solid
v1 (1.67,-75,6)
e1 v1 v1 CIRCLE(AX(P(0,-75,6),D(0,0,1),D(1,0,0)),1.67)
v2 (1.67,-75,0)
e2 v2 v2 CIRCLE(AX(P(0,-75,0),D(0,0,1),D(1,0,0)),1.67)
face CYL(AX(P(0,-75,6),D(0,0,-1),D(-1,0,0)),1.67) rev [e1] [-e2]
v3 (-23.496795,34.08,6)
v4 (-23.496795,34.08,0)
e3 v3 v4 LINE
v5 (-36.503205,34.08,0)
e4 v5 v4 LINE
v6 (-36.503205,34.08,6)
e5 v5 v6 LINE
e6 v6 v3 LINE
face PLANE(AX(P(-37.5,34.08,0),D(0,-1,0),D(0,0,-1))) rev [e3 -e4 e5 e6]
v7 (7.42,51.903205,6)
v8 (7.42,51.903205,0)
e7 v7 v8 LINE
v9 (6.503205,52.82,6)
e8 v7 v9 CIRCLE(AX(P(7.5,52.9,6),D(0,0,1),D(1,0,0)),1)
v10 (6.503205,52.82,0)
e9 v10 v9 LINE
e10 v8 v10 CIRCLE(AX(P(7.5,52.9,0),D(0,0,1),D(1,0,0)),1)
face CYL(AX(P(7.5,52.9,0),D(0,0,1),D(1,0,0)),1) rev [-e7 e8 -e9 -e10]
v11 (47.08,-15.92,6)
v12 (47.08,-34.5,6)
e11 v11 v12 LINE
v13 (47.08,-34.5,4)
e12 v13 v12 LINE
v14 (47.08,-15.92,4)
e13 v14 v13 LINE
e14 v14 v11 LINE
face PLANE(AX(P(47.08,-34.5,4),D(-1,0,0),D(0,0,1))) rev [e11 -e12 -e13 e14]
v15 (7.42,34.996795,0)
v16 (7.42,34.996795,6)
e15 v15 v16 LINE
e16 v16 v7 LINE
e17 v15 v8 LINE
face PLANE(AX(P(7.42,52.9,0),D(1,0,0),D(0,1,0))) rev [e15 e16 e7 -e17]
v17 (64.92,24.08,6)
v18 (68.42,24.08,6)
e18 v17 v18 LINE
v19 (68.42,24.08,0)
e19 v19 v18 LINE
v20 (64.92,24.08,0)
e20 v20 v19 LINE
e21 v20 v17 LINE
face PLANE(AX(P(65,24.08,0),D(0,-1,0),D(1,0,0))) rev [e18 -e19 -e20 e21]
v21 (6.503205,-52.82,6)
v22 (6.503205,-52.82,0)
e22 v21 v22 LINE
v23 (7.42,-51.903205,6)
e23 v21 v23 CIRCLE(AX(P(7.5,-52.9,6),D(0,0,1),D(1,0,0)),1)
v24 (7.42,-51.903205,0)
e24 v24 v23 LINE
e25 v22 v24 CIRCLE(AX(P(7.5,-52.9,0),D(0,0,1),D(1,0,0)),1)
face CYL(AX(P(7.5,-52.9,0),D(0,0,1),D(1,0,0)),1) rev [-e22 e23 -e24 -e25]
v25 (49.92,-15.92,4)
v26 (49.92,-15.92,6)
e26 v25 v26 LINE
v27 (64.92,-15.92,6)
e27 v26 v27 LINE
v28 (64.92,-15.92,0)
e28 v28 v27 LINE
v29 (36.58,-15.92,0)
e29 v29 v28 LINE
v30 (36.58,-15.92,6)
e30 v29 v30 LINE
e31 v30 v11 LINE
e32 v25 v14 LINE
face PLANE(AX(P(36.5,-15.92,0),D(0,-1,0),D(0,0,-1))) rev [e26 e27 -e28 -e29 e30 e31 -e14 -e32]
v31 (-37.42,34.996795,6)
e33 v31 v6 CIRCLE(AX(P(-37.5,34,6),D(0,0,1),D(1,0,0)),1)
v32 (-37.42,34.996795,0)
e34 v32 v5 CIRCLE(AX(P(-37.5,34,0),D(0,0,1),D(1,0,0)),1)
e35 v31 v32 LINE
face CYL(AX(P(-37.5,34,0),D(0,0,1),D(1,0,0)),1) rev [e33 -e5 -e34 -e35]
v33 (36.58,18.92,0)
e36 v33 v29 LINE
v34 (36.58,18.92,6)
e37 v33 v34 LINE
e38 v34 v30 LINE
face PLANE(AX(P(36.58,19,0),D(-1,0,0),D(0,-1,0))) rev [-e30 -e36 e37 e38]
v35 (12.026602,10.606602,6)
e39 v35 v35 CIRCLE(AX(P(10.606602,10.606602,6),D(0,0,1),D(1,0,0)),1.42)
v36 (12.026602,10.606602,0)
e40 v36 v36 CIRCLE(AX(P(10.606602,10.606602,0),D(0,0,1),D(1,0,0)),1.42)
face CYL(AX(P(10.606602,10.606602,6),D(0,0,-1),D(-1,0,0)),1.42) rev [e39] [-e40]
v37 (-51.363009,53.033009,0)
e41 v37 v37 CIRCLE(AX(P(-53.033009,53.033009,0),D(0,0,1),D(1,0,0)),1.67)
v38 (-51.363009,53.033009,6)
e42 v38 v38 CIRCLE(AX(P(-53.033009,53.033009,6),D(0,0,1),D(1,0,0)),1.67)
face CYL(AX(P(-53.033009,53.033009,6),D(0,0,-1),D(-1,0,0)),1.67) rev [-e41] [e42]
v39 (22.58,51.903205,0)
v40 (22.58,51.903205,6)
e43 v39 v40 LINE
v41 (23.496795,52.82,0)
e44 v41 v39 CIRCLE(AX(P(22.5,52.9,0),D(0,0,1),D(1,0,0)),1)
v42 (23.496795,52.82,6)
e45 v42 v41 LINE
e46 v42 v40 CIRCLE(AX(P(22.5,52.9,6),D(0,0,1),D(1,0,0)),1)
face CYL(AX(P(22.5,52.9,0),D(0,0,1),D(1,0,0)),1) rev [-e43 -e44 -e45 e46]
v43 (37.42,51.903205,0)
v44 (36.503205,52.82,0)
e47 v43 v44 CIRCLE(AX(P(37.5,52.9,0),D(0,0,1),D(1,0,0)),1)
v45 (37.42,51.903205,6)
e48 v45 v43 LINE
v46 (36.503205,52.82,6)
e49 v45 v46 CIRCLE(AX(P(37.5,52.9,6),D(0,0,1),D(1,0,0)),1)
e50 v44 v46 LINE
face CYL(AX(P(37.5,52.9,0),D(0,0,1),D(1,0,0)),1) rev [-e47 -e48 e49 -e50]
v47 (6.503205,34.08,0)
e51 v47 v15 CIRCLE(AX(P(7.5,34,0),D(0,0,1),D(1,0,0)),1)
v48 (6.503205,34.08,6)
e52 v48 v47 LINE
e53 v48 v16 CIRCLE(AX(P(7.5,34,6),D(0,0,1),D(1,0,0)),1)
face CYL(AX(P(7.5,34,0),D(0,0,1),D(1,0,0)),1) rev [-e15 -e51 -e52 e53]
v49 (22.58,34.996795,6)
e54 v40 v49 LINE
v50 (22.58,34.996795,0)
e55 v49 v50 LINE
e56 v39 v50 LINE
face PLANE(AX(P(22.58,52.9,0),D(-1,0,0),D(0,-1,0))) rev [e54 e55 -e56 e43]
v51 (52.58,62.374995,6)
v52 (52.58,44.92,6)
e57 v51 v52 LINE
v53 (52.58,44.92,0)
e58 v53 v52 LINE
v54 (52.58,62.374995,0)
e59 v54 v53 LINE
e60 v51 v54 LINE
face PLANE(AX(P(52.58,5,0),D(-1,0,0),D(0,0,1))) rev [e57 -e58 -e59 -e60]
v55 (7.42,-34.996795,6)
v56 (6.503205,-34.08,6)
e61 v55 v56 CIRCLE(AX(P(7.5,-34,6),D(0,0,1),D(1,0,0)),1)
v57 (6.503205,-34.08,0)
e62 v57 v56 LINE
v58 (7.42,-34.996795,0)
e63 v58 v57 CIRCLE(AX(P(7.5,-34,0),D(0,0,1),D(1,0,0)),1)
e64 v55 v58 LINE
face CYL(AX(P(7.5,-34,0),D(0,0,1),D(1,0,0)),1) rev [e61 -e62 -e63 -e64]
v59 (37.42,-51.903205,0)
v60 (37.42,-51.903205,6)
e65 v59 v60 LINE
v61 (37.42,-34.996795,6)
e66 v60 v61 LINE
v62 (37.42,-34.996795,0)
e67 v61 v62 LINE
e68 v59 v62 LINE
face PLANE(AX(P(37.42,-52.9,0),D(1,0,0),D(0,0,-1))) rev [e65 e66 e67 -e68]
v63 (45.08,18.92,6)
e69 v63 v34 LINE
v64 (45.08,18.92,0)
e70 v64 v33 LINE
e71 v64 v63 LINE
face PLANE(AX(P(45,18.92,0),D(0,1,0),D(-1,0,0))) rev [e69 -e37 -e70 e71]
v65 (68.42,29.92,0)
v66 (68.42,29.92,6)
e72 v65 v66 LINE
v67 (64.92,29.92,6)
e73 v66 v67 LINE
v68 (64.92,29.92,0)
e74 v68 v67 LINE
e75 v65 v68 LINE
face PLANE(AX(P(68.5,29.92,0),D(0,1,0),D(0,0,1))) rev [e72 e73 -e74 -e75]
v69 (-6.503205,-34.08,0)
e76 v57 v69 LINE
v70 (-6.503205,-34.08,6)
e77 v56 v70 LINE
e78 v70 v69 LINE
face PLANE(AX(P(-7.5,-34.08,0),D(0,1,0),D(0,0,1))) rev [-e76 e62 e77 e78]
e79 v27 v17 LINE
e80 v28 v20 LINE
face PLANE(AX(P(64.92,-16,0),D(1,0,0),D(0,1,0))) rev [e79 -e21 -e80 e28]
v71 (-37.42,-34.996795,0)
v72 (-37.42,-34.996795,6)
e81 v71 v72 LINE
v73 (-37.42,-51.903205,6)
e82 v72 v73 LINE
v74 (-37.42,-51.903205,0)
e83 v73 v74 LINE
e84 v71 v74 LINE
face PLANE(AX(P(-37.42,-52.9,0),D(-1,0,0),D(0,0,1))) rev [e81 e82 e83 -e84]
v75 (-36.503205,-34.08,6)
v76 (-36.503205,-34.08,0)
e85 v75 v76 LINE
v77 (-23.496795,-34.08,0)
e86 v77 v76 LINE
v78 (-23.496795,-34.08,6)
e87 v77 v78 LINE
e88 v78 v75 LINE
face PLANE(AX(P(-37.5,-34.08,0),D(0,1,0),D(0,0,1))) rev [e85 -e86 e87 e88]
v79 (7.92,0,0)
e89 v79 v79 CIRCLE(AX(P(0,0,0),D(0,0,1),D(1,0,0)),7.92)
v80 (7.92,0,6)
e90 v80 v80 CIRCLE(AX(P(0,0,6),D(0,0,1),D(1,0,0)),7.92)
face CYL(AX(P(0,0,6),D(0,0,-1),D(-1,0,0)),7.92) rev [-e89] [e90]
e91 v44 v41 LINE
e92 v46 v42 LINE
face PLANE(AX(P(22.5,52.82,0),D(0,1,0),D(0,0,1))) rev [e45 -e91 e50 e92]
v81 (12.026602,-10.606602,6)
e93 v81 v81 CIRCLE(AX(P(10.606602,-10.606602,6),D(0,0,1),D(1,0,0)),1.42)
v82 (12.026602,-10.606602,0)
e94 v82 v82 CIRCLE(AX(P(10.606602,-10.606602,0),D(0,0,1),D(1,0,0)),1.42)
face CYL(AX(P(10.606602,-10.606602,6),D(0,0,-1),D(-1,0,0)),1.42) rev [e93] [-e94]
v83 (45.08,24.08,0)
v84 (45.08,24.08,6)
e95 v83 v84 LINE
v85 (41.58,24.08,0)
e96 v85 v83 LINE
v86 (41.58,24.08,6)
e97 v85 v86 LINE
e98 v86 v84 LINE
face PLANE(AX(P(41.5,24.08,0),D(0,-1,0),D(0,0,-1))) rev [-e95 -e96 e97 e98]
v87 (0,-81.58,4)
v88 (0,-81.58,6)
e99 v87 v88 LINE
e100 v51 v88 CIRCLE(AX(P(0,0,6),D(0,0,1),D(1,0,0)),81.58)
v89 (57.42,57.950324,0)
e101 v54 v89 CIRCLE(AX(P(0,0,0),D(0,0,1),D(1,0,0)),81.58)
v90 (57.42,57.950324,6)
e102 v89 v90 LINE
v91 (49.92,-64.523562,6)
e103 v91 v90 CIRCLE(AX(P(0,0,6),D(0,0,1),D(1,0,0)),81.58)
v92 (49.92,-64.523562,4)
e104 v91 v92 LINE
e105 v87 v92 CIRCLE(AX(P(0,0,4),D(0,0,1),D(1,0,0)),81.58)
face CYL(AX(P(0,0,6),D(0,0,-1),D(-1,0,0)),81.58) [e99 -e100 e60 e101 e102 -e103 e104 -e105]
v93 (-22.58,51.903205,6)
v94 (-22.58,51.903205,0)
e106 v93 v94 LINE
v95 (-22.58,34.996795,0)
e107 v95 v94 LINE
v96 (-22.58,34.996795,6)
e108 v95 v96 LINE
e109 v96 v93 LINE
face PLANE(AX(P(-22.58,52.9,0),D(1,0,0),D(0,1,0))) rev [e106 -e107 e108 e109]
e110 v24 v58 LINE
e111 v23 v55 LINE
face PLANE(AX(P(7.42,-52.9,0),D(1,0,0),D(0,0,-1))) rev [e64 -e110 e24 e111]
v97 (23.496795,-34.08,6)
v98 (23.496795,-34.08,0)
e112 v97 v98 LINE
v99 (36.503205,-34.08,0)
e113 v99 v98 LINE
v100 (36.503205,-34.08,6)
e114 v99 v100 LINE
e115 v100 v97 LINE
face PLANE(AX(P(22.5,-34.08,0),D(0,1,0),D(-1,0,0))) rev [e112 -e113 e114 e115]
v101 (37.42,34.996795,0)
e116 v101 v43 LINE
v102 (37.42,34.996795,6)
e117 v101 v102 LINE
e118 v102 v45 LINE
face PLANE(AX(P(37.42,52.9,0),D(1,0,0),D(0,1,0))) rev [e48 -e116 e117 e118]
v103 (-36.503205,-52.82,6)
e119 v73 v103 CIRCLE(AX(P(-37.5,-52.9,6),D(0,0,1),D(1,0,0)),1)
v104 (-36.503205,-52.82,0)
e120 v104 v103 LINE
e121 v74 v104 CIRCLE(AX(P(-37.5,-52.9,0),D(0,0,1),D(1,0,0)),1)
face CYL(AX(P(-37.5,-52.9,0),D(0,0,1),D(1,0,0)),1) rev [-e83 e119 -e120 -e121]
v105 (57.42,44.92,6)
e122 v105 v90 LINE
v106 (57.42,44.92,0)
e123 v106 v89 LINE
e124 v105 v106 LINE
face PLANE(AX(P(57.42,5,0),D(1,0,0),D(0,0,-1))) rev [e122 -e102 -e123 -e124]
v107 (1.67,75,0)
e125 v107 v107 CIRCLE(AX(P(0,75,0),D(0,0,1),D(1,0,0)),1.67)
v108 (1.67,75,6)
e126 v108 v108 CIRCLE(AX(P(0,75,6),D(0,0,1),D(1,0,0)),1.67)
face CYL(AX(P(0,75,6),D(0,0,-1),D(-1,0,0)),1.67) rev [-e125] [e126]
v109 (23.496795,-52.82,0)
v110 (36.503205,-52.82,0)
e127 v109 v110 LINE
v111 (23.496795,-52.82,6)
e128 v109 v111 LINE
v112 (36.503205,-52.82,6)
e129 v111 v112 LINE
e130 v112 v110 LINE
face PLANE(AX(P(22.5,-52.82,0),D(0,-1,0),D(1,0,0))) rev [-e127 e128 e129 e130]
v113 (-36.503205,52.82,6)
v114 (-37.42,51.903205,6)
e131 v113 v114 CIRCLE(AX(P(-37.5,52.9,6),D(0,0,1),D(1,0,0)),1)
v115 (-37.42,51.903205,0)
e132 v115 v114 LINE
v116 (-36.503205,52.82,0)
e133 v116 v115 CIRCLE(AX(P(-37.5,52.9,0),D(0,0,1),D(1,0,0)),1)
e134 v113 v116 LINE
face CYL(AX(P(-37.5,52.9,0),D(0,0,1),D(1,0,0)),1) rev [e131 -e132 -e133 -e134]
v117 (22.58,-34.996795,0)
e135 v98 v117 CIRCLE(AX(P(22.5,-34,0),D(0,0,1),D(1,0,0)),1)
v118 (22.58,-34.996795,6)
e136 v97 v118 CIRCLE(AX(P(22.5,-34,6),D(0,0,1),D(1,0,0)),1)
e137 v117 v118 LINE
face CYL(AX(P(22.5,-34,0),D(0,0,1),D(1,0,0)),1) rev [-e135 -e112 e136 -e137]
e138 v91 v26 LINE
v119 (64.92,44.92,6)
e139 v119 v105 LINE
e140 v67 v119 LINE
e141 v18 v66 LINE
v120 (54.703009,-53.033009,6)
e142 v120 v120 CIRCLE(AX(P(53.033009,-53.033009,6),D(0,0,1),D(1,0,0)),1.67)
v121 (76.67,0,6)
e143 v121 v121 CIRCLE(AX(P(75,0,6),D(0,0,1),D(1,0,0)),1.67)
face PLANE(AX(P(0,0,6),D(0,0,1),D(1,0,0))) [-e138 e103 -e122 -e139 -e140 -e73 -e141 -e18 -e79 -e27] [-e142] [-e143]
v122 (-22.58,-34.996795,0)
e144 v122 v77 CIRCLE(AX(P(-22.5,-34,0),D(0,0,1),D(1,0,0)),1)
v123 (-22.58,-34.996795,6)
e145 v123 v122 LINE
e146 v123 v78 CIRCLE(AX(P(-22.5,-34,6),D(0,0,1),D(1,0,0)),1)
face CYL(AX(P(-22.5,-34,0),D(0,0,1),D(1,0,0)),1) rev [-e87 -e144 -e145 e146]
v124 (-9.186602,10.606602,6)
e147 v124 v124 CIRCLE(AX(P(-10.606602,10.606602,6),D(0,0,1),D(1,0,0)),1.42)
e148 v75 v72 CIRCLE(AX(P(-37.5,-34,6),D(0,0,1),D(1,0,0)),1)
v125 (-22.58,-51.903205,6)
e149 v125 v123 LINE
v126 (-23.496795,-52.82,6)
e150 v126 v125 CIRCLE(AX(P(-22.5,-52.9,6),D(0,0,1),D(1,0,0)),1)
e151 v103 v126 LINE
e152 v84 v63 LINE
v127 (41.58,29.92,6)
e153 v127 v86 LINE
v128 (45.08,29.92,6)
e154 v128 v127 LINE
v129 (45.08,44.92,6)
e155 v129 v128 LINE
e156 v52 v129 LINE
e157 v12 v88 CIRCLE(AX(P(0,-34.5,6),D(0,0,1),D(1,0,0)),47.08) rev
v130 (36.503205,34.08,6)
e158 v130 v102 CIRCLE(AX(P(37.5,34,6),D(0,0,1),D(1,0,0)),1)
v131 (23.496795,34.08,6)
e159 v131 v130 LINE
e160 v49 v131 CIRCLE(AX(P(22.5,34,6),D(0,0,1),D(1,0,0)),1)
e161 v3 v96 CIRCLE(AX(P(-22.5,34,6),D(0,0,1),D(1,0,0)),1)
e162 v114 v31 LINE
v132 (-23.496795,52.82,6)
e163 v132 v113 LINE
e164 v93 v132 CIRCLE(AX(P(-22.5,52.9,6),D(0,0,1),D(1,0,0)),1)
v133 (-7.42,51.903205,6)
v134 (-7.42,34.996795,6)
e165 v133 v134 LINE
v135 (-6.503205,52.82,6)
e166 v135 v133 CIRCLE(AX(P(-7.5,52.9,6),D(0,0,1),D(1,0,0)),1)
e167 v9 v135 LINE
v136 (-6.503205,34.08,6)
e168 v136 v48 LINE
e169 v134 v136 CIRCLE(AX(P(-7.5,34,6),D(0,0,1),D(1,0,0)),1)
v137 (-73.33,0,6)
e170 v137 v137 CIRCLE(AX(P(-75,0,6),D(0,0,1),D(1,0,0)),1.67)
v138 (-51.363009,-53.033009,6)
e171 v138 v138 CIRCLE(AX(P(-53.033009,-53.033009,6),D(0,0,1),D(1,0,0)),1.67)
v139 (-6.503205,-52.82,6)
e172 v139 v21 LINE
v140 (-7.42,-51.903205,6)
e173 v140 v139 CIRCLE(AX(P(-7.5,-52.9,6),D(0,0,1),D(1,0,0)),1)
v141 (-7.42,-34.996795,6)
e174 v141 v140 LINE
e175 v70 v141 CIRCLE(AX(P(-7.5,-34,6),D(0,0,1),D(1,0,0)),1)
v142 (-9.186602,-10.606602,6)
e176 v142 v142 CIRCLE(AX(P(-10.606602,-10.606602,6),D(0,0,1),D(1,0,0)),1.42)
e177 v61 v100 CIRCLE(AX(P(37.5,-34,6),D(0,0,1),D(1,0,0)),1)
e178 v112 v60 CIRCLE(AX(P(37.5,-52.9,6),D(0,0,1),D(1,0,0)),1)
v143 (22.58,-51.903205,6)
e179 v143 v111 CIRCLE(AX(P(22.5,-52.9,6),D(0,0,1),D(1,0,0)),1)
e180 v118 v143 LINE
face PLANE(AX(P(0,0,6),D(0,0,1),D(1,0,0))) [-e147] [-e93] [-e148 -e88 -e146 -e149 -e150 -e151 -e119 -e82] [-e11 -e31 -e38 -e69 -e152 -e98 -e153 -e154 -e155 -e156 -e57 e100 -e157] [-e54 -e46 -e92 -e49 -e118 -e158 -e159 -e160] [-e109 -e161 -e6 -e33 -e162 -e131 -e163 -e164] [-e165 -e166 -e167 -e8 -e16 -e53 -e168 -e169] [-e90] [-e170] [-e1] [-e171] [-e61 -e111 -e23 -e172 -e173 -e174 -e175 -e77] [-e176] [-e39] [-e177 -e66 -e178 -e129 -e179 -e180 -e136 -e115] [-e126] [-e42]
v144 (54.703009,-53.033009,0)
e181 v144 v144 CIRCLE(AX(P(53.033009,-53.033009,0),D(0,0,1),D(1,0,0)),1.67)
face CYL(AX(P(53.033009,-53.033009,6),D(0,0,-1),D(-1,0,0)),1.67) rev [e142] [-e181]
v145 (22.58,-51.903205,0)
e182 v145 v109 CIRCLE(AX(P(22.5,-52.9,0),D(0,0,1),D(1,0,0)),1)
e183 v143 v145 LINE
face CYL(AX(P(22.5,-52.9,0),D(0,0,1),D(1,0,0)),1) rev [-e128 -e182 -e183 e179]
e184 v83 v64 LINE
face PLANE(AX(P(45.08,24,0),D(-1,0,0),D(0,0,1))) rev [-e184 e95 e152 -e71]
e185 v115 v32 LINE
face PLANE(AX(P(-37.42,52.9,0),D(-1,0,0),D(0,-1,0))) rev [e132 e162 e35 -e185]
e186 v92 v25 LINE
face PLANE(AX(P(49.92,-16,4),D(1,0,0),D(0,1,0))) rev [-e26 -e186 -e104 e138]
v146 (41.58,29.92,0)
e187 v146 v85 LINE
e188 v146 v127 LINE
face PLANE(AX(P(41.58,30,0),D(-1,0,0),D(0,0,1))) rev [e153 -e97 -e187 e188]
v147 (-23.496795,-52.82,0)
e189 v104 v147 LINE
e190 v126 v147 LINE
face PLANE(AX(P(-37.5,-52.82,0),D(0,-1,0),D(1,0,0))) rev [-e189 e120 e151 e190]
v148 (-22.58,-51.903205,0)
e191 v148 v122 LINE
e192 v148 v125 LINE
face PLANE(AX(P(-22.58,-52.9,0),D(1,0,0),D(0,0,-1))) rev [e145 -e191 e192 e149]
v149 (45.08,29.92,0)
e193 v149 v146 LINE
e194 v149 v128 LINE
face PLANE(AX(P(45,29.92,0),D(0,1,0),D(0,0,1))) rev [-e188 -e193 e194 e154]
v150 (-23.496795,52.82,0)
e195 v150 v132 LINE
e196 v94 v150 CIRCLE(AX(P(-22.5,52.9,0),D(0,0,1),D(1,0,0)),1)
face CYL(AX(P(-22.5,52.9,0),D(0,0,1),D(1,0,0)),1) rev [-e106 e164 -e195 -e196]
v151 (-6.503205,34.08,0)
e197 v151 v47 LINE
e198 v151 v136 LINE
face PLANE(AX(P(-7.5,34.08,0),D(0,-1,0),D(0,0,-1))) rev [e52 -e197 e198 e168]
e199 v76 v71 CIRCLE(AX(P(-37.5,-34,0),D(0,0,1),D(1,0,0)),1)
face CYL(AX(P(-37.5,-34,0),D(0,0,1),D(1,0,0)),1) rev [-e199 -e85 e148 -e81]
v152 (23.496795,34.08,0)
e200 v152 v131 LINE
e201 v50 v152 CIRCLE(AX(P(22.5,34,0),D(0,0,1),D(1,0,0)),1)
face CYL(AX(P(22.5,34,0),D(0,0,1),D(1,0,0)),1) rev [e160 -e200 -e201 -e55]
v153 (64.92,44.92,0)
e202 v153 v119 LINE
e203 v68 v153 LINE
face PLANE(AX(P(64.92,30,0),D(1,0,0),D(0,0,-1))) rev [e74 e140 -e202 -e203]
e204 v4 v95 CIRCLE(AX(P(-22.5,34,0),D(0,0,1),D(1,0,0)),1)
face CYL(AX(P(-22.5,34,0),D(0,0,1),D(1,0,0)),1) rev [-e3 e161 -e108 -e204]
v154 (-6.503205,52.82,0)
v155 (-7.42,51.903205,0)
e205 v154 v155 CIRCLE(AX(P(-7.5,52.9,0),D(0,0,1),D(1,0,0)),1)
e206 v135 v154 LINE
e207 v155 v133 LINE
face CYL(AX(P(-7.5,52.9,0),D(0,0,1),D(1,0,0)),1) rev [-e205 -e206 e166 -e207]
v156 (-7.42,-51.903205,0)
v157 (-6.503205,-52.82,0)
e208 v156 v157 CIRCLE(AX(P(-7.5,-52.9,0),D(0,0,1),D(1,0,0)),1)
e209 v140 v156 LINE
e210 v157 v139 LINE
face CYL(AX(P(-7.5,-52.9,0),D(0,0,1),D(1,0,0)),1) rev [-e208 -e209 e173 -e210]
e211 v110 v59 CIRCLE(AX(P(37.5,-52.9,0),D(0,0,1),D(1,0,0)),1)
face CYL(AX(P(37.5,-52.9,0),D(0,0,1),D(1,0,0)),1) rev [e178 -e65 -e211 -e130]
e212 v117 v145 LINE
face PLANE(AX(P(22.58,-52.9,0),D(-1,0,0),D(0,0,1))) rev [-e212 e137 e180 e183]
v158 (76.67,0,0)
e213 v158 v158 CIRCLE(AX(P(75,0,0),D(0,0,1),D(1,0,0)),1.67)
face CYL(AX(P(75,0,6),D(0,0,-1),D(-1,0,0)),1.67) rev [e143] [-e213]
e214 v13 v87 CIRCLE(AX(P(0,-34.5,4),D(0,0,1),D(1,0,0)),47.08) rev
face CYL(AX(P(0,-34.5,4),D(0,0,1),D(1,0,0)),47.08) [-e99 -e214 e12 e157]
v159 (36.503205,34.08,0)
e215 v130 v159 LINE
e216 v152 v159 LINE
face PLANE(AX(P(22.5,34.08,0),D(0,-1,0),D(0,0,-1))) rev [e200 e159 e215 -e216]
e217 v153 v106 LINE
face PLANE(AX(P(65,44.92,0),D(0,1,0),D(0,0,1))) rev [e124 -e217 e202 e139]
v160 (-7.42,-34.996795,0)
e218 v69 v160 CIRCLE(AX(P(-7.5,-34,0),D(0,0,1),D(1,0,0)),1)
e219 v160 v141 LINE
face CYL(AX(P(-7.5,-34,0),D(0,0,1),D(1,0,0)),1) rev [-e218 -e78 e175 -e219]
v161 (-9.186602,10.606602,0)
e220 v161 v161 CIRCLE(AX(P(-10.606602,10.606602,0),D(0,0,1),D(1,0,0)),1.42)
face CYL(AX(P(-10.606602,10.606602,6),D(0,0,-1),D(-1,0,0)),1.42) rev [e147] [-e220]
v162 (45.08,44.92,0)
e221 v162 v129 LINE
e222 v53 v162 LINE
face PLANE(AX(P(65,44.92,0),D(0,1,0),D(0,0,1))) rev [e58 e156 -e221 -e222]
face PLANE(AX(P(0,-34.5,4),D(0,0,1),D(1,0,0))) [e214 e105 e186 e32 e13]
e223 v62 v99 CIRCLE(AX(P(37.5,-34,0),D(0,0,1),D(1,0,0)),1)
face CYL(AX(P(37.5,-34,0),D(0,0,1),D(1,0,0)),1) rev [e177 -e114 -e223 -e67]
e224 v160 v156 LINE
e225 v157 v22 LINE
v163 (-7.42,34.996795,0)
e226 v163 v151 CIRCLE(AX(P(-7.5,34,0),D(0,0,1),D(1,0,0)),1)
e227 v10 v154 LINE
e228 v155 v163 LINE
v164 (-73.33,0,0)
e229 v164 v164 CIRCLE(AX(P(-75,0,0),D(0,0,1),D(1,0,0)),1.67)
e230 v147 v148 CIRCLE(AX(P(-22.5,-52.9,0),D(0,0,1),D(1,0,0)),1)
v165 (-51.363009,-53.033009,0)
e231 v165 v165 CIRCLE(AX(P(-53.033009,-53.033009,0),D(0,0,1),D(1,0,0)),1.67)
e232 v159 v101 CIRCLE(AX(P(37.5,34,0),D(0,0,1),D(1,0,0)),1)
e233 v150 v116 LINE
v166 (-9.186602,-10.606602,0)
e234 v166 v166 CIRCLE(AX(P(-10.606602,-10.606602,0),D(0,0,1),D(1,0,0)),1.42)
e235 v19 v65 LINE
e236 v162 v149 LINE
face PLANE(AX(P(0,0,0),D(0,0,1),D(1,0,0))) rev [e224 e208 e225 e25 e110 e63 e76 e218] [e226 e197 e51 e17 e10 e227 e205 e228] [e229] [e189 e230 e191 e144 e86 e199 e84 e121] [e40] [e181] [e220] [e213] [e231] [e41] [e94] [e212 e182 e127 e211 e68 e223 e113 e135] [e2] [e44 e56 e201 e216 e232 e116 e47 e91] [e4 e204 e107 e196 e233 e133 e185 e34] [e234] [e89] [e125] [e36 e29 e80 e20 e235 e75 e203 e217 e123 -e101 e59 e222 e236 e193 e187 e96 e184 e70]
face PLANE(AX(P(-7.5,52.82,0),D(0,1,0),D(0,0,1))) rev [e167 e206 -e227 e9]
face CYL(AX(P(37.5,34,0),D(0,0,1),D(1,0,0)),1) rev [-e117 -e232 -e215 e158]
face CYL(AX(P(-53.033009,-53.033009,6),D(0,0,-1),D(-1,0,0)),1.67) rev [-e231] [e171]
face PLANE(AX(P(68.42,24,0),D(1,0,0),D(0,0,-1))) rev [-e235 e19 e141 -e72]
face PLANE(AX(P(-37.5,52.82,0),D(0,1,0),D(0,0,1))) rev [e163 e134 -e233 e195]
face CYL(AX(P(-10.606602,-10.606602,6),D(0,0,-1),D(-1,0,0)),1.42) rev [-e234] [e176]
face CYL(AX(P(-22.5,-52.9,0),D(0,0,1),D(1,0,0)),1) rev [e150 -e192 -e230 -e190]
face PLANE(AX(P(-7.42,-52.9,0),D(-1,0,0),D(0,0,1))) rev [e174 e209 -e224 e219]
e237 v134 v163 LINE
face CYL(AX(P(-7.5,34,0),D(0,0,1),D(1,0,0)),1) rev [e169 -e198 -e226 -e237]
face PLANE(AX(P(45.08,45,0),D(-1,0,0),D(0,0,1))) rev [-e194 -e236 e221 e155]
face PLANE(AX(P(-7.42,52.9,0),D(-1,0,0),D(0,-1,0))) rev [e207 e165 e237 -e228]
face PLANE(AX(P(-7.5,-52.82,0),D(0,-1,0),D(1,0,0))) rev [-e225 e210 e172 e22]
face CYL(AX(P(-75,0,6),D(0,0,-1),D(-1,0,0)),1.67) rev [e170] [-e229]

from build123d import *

# Parameters (mm, degrees)
SKETCH1_R              = 81.5
SKETCH1_R_2            = 8
SKETCH1_R_3            = 1.5
SKETCH1_R_4            = 1.75
BOSS_EXTRUDE1_DEPTH    = 6
CUT_EXTRUDE9_DEPTH     = 116.414470497
SKETCH12_W             = 15
SKETCH12_H             = 18.9
CUT_EXTRUDE12_DEPTH    = 116.414470497
SKETCH13_R             = 1
CUT_EXTRUDE13_DEPTH    = 116.414470497
SKETCH14_W             = 5
SKETCH14_H             = 80
CUT_EXTRUDE14_DEPTH    = 116.414470497
CUT_EXTRUDE15_DEPTH    = 2
MOVE_FACE1_OUTLINE_R   = 8
MOVE_FACE1_OUTLINE_R_2 = 7.92
MOVE_FACE1_OUTLINE_R_3 = 1.5
MOVE_FACE1_OUTLINE_R_4 = 1.42
MOVE_FACE1_OUTLINE_R_5 = 1.75
MOVE_FACE1_OUTLINE_R_6 = 1.67
MOVE_FACE1_DEPTH       = 6
MOVE_FACE1_2_OUTLINE_W = 2.84
MOVE_FACE1_2_OUTLINE_H = 0.08
MOVE_FACE1_2_DEPTH     = 4


# Read off the part's stored shape, not the designer's step: Move Face1
with BuildPart() as part:
    # Sketch1 → Boss-Extrude1 (new body)
    with BuildSketch(Plane.XY):
        Circle(SKETCH1_R)
        Circle(SKETCH1_R_2, mode=Mode.SUBTRACT)
        with Locations((10.606601718, -10.606601718)):
            Circle(SKETCH1_R_3, mode=Mode.SUBTRACT)
        with Locations((0, -75)):
            Circle(SKETCH1_R_4, mode=Mode.SUBTRACT)
        with Locations((-10.606601718, -10.606601718)):
            Circle(SKETCH1_R_3, mode=Mode.SUBTRACT)
        with Locations((-10.606601718, 10.606601718)):
            Circle(SKETCH1_R_3, mode=Mode.SUBTRACT)
        with Locations((10.606601718, 10.606601718)):
            Circle(SKETCH1_R_3, mode=Mode.SUBTRACT)
        with Locations((-53.033008589, -53.033008589)):
            Circle(SKETCH1_R_4, mode=Mode.SUBTRACT)
        with Locations((-75, 0)):
            Circle(SKETCH1_R_4, mode=Mode.SUBTRACT)
        with Locations((-53.033008589, 53.033008589)):
            Circle(SKETCH1_R_4, mode=Mode.SUBTRACT)
        with Locations((0, 75)):
            Circle(SKETCH1_R_4, mode=Mode.SUBTRACT)
        with Locations((75, 0)):
            Circle(SKETCH1_R_4, mode=Mode.SUBTRACT)
        with Locations((53.033008589, -53.033008589)):
            Circle(SKETCH1_R_4, mode=Mode.SUBTRACT)
    extrude(amount=BOSS_EXTRUDE1_DEPTH)

    # Sketch11 → Cut-Extrude9 (cut, through all)
    with BuildSketch(Plane.XY.offset(6)):
        Polygon((36.5, -16), (65, -16), (65, 24), (68.5, 24), (68.5, 30), (65, 30), (65, 45), (45, 45), (45, 30), (41.5, 30), (41.5, 24), (45, 24), (45, 19), (36.5, 19), align=None)
    extrude(amount=-CUT_EXTRUDE9_DEPTH, mode=Mode.SUBTRACT)

    # Sketch12 → Cut-Extrude12 (cut, through all)
    with BuildSketch(Plane.XY.offset(6)):
        with Locations((-30, -43.45)):
            Rectangle(SKETCH12_W, SKETCH12_H)
        with Locations((-30, 43.45)):
            Rectangle(SKETCH12_W, SKETCH12_H)
        with Locations((30, 43.45)):
            Rectangle(SKETCH12_W, SKETCH12_H)
        with Locations((0, -43.45)):
            Rectangle(SKETCH12_W, SKETCH12_H)
        with Locations((30, -43.45)):
            Rectangle(SKETCH12_W, SKETCH12_H)
        with Locations((0, 43.45)):
            Rectangle(SKETCH12_W, SKETCH12_H)
    extrude(amount=-CUT_EXTRUDE12_DEPTH, mode=Mode.SUBTRACT)

    # Sketch13 → Cut-Extrude13 (cut, through all)
    with BuildSketch(Plane.XY.offset(6)):
        with Locations((-37.5, 52.9)):
            Circle(SKETCH13_R)
        with Locations((-22.5, 52.9)):
            Circle(SKETCH13_R)
        with Locations((-37.5, 34)):
            Circle(SKETCH13_R)
        with Locations((-22.5, 34)):
            Circle(SKETCH13_R)
        with Locations((-7.5, 52.9)):
            Circle(SKETCH13_R)
        with Locations((-7.5, 34)):
            Circle(SKETCH13_R)
        with Locations((7.5, 52.9)):
            Circle(SKETCH13_R)
        with Locations((7.5, 34)):
            Circle(SKETCH13_R)
        with Locations((22.5, 52.9)):
            Circle(SKETCH13_R)
        with Locations((22.5, 34)):
            Circle(SKETCH13_R)
        with Locations((37.5, 34)):
            Circle(SKETCH13_R)
        with Locations((37.5, 52.9)):
            Circle(SKETCH13_R)
        with Locations((-37.5, -34)):
            Circle(SKETCH13_R)
        with Locations((-22.5, -34)):
            Circle(SKETCH13_R)
        with Locations((-22.5, -52.9)):
            Circle(SKETCH13_R)
        with Locations((-37.5, -52.9)):
            Circle(SKETCH13_R)
        with Locations((-7.5, -34)):
            Circle(SKETCH13_R)
        with Locations((-7.5, -52.9)):
            Circle(SKETCH13_R)
        with Locations((7.5, -52.9)):
            Circle(SKETCH13_R)
        with Locations((7.5, -34)):
            Circle(SKETCH13_R)
        with Locations((22.5, -34)):
            Circle(SKETCH13_R)
        with Locations((37.5, -34)):
            Circle(SKETCH13_R)
        with Locations((37.5, -52.9)):
            Circle(SKETCH13_R)
        with Locations((22.5, -52.9)):
            Circle(SKETCH13_R)
    extrude(amount=-CUT_EXTRUDE13_DEPTH, mode=Mode.SUBTRACT)

    # Sketch14 → Cut-Extrude14 (cut, through all)
    with BuildSketch(Plane.XY.offset(6)):
        with Locations((55, 45)):
            Rectangle(SKETCH14_W, SKETCH14_H)
    extrude(amount=-CUT_EXTRUDE14_DEPTH, mode=Mode.SUBTRACT)

    # Sketch15 → Cut-Extrude15 (cut)
    with BuildSketch(Plane.XY.offset(6)):
        with BuildLine():
            Line((47, -34.5), (47, -16))
            Line((47, -16), (50, -16))
            Line((50, -16), (50, -81.5))
            Line((50, -81.5), (0, -81.5))
            ThreePointArc((0, -81.5), (33.234018716, -67.734018716), (47, -34.5))
        make_face()
    extrude(amount=-CUT_EXTRUDE15_DEPTH, mode=Mode.SUBTRACT)

    # Move Face1 outline → Move Face1 (add)
    # profile 1 of 38: a face of its own
    with BuildSketch(Plane.XY):
        with BuildLine():
            Line((57.42, 44.92), (64.92, 44.92))
            Line((64.92, 44.92), (64.92, 29.92))
            Line((64.92, 29.92), (68.42, 29.92))
            Line((68.42, 29.92), (68.42, 24.08))
            Line((68.42, 24.08), (64.92, 24.08))
            Line((64.92, 24.08), (64.92, -15.92))
            Line((64.92, -15.92), (49.92, -15.92))
            Line((49.92, -15.92), (49.920000001, -64.523561589))
            ThreePointArc((49.920000001, -64.523561589), (81.427464872, -4.986418009), (57.42, 57.950323554))
            Line((57.42, 57.950323554), (57.42, 44.92))
        make_face()
        with BuildLine():
            ThreePointArc((57.5, 57.758116313), (81.346728558, -4.99597369), (50.000000001, -64.36031386))
            Line((50.000000001, -64.36031386), (50, -16))
            Line((50, -16), (65, -16))
            Line((65, -16), (65, 24))
            Line((65, 24), (68.5, 24))
            Line((68.5, 24), (68.5, 30))
            Line((68.5, 30), (65, 30))
            Line((65, 30), (65, 45))
            Line((65, 45), (57.5, 45))
            Line((57.5, 45), (57.5, 57.758116313))
        make_face(mode=Mode.SUBTRACT)
    # profile 2 of 38: a face of its own
    with BuildSketch(Plane.XY):
        with BuildLine():
            ThreePointArc((52.58, 62.37499499), (-76.628481948, 27.988786224), (0, -81.580000001))
            ThreePointArc((0, -81.580000001), (33.290587258, -67.790587258), (47.08, -34.5))
            Line((47.08, -34.5), (47.08, -15.92))
            Line((47.08, -15.92), (36.58, -15.92))
            Line((36.58, -15.92), (36.58, 18.92))
            Line((36.58, 18.92), (45.08, 18.92))
            Line((45.08, 18.92), (45.08, 24.08))
            Line((45.08, 24.08), (41.58, 24.08))
            Line((41.58, 24.08), (41.58, 29.92))
            Line((41.58, 29.92), (45.08, 29.92))
            Line((45.08, 29.92), (45.08, 44.92))
            Line((45.08, 44.92), (52.58, 44.92))
            Line((52.58, 44.92), (52.58, 62.37499499))
        make_face()
        with BuildLine():
            Line((36.5, -16), (47, -16))
            Line((47, -16), (47, -34.5))
            ThreePointArc((47, -34.5), (33.234018716, -67.734018716), (0, -81.5))
            ThreePointArc((0, -81.5), (-76.559714746, 27.943873706), (52.5, 62.337789502))
            Line((52.5, 62.337789502), (52.5, 45))
            Line((52.5, 45), (45, 45))
            Line((45, 45), (45, 30))
            Line((45, 30), (41.5, 30))
            Line((41.5, 30), (41.5, 24))
            Line((41.5, 24), (45, 24))
            Line((45, 24), (45, 19))
            Line((45, 19), (36.5, 19))
            Line((36.5, 19), (36.5, -16))
        make_face(mode=Mode.SUBTRACT)
    # profile 3 of 38: a face of its own
    with BuildSketch(Plane.XY):
        with BuildLine():
            Line((-37.42, -51.903205136), (-37.42, -34.996794864))
            ThreePointArc((-37.42, -34.996794864), (-37.45996791, -34.999198395), (-37.5, -35))
            Line((-37.5, -35), (-37.5, -51.9))
            ThreePointArc((-37.5, -51.9), (-37.45996791, -51.900801605), (-37.42, -51.903205136))
        make_face()
    # profile 4 of 38: a face of its own
    with BuildSketch(Plane.XY):
        with BuildLine():
            Line((-23.5, -34), (-36.5, -34))
            ThreePointArc((-36.5, -34), (-36.500801605, -34.04003209), (-36.503205136, -34.08))
            Line((-36.503205136, -34.08), (-23.496794864, -34.08))
            ThreePointArc((-23.496794864, -34.08), (-23.499198395, -34.04003209), (-23.5, -34))
        make_face()
    # profile 5 of 38: a face of its own
    with BuildSketch(Plane.XY):
        with BuildLine():
            ThreePointArc((-36.503205136, -52.82), (-36.500801605, -52.85996791), (-36.5, -52.9))
            Line((-36.5, -52.9), (-23.5, -52.9))
            ThreePointArc((-23.5, -52.9), (-23.499198395, -52.85996791), (-23.496794864, -52.82))
            Line((-23.496794864, -52.82), (-36.503205136, -52.82))
        make_face()
    # profile 6 of 38: a face of its own
    with BuildSketch(Plane.XY):
        with BuildLine():
            Line((-22.5, -51.9), (-22.5, -35))
            ThreePointArc((-22.5, -35), (-22.54003209, -34.999198395), (-22.58, -34.996794864))
            Line((-22.58, -34.996794864), (-22.58, -51.903205136))
            ThreePointArc((-22.58, -51.903205136), (-22.54003209, -51.900801605), (-22.5, -51.9))
        make_face()
    # profile 7 of 38: a face of its own
    with BuildSketch(Plane.XY):
        with BuildLine():
            Line((-37.42, 34.996794864), (-37.42, 51.903205136))
            ThreePointArc((-37.42, 51.903205136), (-37.45996791, 51.900801605), (-37.5, 51.9))
            Line((-37.5, 51.9), (-37.5, 35))
            ThreePointArc((-37.5, 35), (-37.45996791, 34.999198395), (-37.42, 34.996794864))
        make_face()
    # profile 8 of 38: a face of its own
    with BuildSketch(Plane.XY):
        with BuildLine():
            Line((-23.5, 52.9), (-36.5, 52.9))
            ThreePointArc((-36.5, 52.9), (-36.500801605, 52.85996791), (-36.503205136, 52.82))
            Line((-36.503205136, 52.82), (-23.496794864, 52.82))
            ThreePointArc((-23.496794864, 52.82), (-23.499198395, 52.85996791), (-23.5, 52.9))
        make_face()
    # profile 9 of 38: a face of its own
    with BuildSketch(Plane.XY):
        with BuildLine():
            ThreePointArc((-36.503205136, 34.08), (-36.500801605, 34.04003209), (-36.5, 34))
            Line((-36.5, 34), (-23.5, 34))
            ThreePointArc((-23.5, 34), (-23.499198395, 34.04003209), (-23.496794864, 34.08))
            Line((-23.496794864, 34.08), (-36.503205136, 34.08))
        make_face()
    # profile 10 of 38: a face of its own
    with BuildSketch(Plane.XY):
        with BuildLine():
            Line((-22.5, 35), (-22.5, 51.9))
            ThreePointArc((-22.5, 51.9), (-22.54003209, 51.900801605), (-22.58, 51.903205136))
            Line((-22.58, 51.903205136), (-22.58, 34.996794864))
            ThreePointArc((-22.58, 34.996794864), (-22.54003209, 34.999198395), (-22.5, 35))
        make_face()
    # profile 11 of 38: a face of its own
    with BuildSketch(Plane.XY):
        with BuildLine():
            Line((-6.503205136, -34.08), (6.503205136, -34.08))
            ThreePointArc((6.503205136, -34.08), (6.500801605, -34.04003209), (6.5, -34))
            Line((6.5, -34), (-6.5, -34))
            ThreePointArc((-6.5, -34), (-6.500801605, -34.04003209), (-6.503205136, -34.08))
        make_face()
    # profile 12 of 38: a face of its own
    with BuildSketch(Plane.XY):
        with BuildLine():
            Line((7.5, -51.9), (7.5, -35))
            ThreePointArc((7.5, -35), (7.45996791, -34.999198395), (7.42, -34.996794864))
            Line((7.42, -34.996794864), (7.42, -51.903205136))
            ThreePointArc((7.42, -51.903205136), (7.45996791, -51.900801605), (7.5, -51.9))
        make_face()
    # profile 13 of 38: a face of its own
    with BuildSketch(Plane.XY):
        with BuildLine():
            ThreePointArc((-7.42, -34.996794864), (-7.45996791, -34.999198395), (-7.5, -35))
            Line((-7.5, -35), (-7.5, -51.9))
            ThreePointArc((-7.5, -51.9), (-7.45996791, -51.900801605), (-7.42, -51.903205136))
            Line((-7.42, -51.903205136), (-7.42, -34.996794864))
        make_face()
    # profile 14 of 38: a face of its own
    with BuildSketch(Plane.XY):
        with BuildLine():
            Line((-6.5, -52.9), (6.5, -52.9))
            ThreePointArc((6.5, -52.9), (6.500801605, -52.85996791), (6.503205136, -52.82))
            Line((6.503205136, -52.82), (-6.503205136, -52.82))
            ThreePointArc((-6.503205136, -52.82), (-6.500801605, -52.85996791), (-6.5, -52.9))
        make_face()
    # profile 15 of 38: a face of its own
    with BuildSketch(Plane.XY):
        with BuildLine():
            Line((23.496794864, -34.08), (36.503205136, -34.08))
            ThreePointArc((36.503205136, -34.08), (36.500801605, -34.04003209), (36.5, -34))
            Line((36.5, -34), (23.5, -34))
            ThreePointArc((23.5, -34), (23.499198395, -34.04003209), (23.496794864, -34.08))
        make_face()
    # profile 16 of 38: a face of its own
    with BuildSketch(Plane.XY):
        with BuildLine():
            Line((37.5, -51.9), (37.5, -35))
            ThreePointArc((37.5, -35), (37.45996791, -34.999198395), (37.42, -34.996794864))
            Line((37.42, -34.996794864), (37.42, -51.903205136))
            ThreePointArc((37.42, -51.903205136), (37.45996791, -51.900801605), (37.5, -51.9))
        make_face()
    # profile 17 of 38: a face of its own
    with BuildSketch(Plane.XY):
        with BuildLine():
            ThreePointArc((22.58, -34.996794864), (22.54003209, -34.999198395), (22.5, -35))
            Line((22.5, -35), (22.5, -51.9))
            ThreePointArc((22.5, -51.9), (22.54003209, -51.900801605), (22.58, -51.903205136))
            Line((22.58, -51.903205136), (22.58, -34.996794864))
        make_face()
    # profile 18 of 38: a face of its own
    with BuildSketch(Plane.XY):
        with BuildLine():
            Line((23.5, -52.9), (36.5, -52.9))
            ThreePointArc((36.5, -52.9), (36.500801605, -52.85996791), (36.503205136, -52.82))
            Line((36.503205136, -52.82), (23.496794864, -52.82))
            ThreePointArc((23.496794864, -52.82), (23.499198395, -52.85996791), (23.5, -52.9))
        make_face()
    # profile 19 of 38: a face of its own
    with BuildSketch(Plane.XY):
        with BuildLine():
            Line((23.496794864, 52.82), (36.503205136, 52.82))
            ThreePointArc((36.503205136, 52.82), (36.500801605, 52.85996791), (36.5, 52.9))
            Line((36.5, 52.9), (23.5, 52.9))
            ThreePointArc((23.5, 52.9), (23.499198395, 52.85996791), (23.496794864, 52.82))
        make_face()
    # profile 20 of 38: a face of its own
    with BuildSketch(Plane.XY):
        with BuildLine():
            Line((37.5, 35), (37.5, 51.9))
            ThreePointArc((37.5, 51.9), (37.45996791, 51.900801605), (37.42, 51.903205136))
            Line((37.42, 51.903205136), (37.42, 34.996794864))
            ThreePointArc((37.42, 34.996794864), (37.45996791, 34.999198395), (37.5, 35))
        make_face()
    # profile 21 of 38: a face of its own
    with BuildSketch(Plane.XY):
        with BuildLine():
            ThreePointArc((22.58, 51.903205136), (22.54003209, 51.900801605), (22.5, 51.9))
            Line((22.5, 51.9), (22.5, 35))
            ThreePointArc((22.5, 35), (22.54003209, 34.999198395), (22.58, 34.996794864))
            Line((22.58, 34.996794864), (22.58, 51.903205136))
        make_face()
    # profile 22 of 38: a face of its own
    with BuildSketch(Plane.XY):
        with BuildLine():
            Line((23.5, 34), (36.5, 34))
            ThreePointArc((36.5, 34), (36.500801605, 34.04003209), (36.503205136, 34.08))
            Line((36.503205136, 34.08), (23.496794864, 34.08))
            ThreePointArc((23.496794864, 34.08), (23.499198395, 34.04003209), (23.5, 34))
        make_face()
    # profile 23 of 38: a face of its own
    with BuildSketch(Plane.XY):
        with BuildLine():
            Line((-6.503205136, 52.82), (6.503205136, 52.82))
            ThreePointArc((6.503205136, 52.82), (6.500801605, 52.85996791), (6.5, 52.9))
            Line((6.5, 52.9), (-6.5, 52.9))
            ThreePointArc((-6.5, 52.9), (-6.500801605, 52.85996791), (-6.503205136, 52.82))
        make_face()
    # profile 24 of 38: a face of its own
    with BuildSketch(Plane.XY):
        with BuildLine():
            Line((7.5, 35), (7.5, 51.9))
            ThreePointArc((7.5, 51.9), (7.45996791, 51.900801605), (7.42, 51.903205136))
            Line((7.42, 51.903205136), (7.42, 34.996794864))
            ThreePointArc((7.42, 34.996794864), (7.45996791, 34.999198395), (7.5, 35))
        make_face()
    # profile 25 of 38: a face of its own
    with BuildSketch(Plane.XY):
        with BuildLine():
            ThreePointArc((-7.42, 51.903205136), (-7.45996791, 51.900801605), (-7.5, 51.9))
            Line((-7.5, 51.9), (-7.5, 35))
            ThreePointArc((-7.5, 35), (-7.45996791, 34.999198395), (-7.42, 34.996794864))
            Line((-7.42, 34.996794864), (-7.42, 51.903205136))
        make_face()
    # profile 26 of 38: a face of its own
    with BuildSketch(Plane.XY):
        with BuildLine():
            Line((-6.5, 34), (6.5, 34))
            ThreePointArc((6.5, 34), (6.500801605, 34.04003209), (6.503205136, 34.08))
            Line((6.503205136, 34.08), (-6.503205136, 34.08))
            ThreePointArc((-6.503205136, 34.08), (-6.500801605, 34.04003209), (-6.5, 34))
        make_face()
    # profile 27 of 38: a face of its own
    with BuildSketch(Plane.XY):
        Circle(MOVE_FACE1_OUTLINE_R)
        Circle(MOVE_FACE1_OUTLINE_R_2, mode=Mode.SUBTRACT)
    # profile 28 of 38: a face of its own
    with BuildSketch(Plane.XY):
        with Locations((10.606601718, -10.606601718)):
            Circle(MOVE_FACE1_OUTLINE_R_3)
        with Locations((10.606601718, -10.606601718)):
            Circle(MOVE_FACE1_OUTLINE_R_4, mode=Mode.SUBTRACT)
    # profile 29 of 38: a face of its own
    with BuildSketch(Plane.XY):
        with Locations((0, -75)):
            Circle(MOVE_FACE1_OUTLINE_R_5)
        with Locations((0, -75)):
            Circle(MOVE_FACE1_OUTLINE_R_6, mode=Mode.SUBTRACT)
    # profile 30 of 38: a face of its own
    with BuildSketch(Plane.XY):
        with Locations((-10.606601718, -10.606601718)):
            Circle(MOVE_FACE1_OUTLINE_R_3)
        with Locations((-10.606601718, -10.606601718)):
            Circle(MOVE_FACE1_OUTLINE_R_4, mode=Mode.SUBTRACT)
    # profile 31 of 38: a face of its own
    with BuildSketch(Plane.XY):
        with Locations((-10.606601718, 10.606601718)):
            Circle(MOVE_FACE1_OUTLINE_R_3)
        with Locations((-10.606601718, 10.606601718)):
            Circle(MOVE_FACE1_OUTLINE_R_4, mode=Mode.SUBTRACT)
    # profile 32 of 38: a face of its own
    with BuildSketch(Plane.XY):
        with Locations((10.606601718, 10.606601718)):
            Circle(MOVE_FACE1_OUTLINE_R_3)
        with Locations((10.606601718, 10.606601718)):
            Circle(MOVE_FACE1_OUTLINE_R_4, mode=Mode.SUBTRACT)
    # profile 33 of 38: a face of its own
    with BuildSketch(Plane.XY):
        with Locations((-53.033008589, -53.033008589)):
            Circle(MOVE_FACE1_OUTLINE_R_5)
        with Locations((-53.033008589, -53.033008589)):
            Circle(MOVE_FACE1_OUTLINE_R_6, mode=Mode.SUBTRACT)
    # profile 34 of 38: a face of its own
    with BuildSketch(Plane.XY):
        with Locations((-75, 0)):
            Circle(MOVE_FACE1_OUTLINE_R_5)
        with Locations((-75, 0)):
            Circle(MOVE_FACE1_OUTLINE_R_6, mode=Mode.SUBTRACT)
    # profile 35 of 38: a face of its own
    with BuildSketch(Plane.XY):
        with Locations((-53.033008589, 53.033008589)):
            Circle(MOVE_FACE1_OUTLINE_R_5)
        with Locations((-53.033008589, 53.033008589)):
            Circle(MOVE_FACE1_OUTLINE_R_6, mode=Mode.SUBTRACT)
    # profile 36 of 38: a face of its own
    with BuildSketch(Plane.XY):
        with Locations((0, 75)):
            Circle(MOVE_FACE1_OUTLINE_R_5)
        with Locations((0, 75)):
            Circle(MOVE_FACE1_OUTLINE_R_6, mode=Mode.SUBTRACT)
    # profile 37 of 38: a face of its own
    with BuildSketch(Plane.XY):
        with Locations((75, 0)):
            Circle(MOVE_FACE1_OUTLINE_R_5)
        with Locations((75, 0)):
            Circle(MOVE_FACE1_OUTLINE_R_6, mode=Mode.SUBTRACT)
    # profile 38 of 38: a face of its own
    with BuildSketch(Plane.XY):
        with Locations((53.033008589, -53.033008589)):
            Circle(MOVE_FACE1_OUTLINE_R_5)
        with Locations((53.033008589, -53.033008589)):
            Circle(MOVE_FACE1_OUTLINE_R_6, mode=Mode.SUBTRACT)
    extrude(amount=MOVE_FACE1_DEPTH)

    # Move Face1 2 outline → Move Face1 2 (add)
    with BuildSketch(Plane.XY):
        with BuildLine():
            ThreePointArc((0, -81.580000001), (26.376734499, -77.198214211), (49.920000001, -64.523561589))
            Line((49.920000001, -64.523561589), (49.92, -64.422384311))
            ThreePointArc((49.92, -64.422384311), (28.366135012, -76.404269414), (4.215193725, -81.390921742))
            ThreePointArc((4.215193725, -81.390921742), (2.109716137, -81.532706682), (0, -81.580000001))
        make_face()
        with Locations((48.5, -15.96)):
            Rectangle(MOVE_FACE1_2_OUTLINE_W, MOVE_FACE1_2_OUTLINE_H)
    extrude(amount=MOVE_FACE1_2_DEPTH)


solid = part.part
